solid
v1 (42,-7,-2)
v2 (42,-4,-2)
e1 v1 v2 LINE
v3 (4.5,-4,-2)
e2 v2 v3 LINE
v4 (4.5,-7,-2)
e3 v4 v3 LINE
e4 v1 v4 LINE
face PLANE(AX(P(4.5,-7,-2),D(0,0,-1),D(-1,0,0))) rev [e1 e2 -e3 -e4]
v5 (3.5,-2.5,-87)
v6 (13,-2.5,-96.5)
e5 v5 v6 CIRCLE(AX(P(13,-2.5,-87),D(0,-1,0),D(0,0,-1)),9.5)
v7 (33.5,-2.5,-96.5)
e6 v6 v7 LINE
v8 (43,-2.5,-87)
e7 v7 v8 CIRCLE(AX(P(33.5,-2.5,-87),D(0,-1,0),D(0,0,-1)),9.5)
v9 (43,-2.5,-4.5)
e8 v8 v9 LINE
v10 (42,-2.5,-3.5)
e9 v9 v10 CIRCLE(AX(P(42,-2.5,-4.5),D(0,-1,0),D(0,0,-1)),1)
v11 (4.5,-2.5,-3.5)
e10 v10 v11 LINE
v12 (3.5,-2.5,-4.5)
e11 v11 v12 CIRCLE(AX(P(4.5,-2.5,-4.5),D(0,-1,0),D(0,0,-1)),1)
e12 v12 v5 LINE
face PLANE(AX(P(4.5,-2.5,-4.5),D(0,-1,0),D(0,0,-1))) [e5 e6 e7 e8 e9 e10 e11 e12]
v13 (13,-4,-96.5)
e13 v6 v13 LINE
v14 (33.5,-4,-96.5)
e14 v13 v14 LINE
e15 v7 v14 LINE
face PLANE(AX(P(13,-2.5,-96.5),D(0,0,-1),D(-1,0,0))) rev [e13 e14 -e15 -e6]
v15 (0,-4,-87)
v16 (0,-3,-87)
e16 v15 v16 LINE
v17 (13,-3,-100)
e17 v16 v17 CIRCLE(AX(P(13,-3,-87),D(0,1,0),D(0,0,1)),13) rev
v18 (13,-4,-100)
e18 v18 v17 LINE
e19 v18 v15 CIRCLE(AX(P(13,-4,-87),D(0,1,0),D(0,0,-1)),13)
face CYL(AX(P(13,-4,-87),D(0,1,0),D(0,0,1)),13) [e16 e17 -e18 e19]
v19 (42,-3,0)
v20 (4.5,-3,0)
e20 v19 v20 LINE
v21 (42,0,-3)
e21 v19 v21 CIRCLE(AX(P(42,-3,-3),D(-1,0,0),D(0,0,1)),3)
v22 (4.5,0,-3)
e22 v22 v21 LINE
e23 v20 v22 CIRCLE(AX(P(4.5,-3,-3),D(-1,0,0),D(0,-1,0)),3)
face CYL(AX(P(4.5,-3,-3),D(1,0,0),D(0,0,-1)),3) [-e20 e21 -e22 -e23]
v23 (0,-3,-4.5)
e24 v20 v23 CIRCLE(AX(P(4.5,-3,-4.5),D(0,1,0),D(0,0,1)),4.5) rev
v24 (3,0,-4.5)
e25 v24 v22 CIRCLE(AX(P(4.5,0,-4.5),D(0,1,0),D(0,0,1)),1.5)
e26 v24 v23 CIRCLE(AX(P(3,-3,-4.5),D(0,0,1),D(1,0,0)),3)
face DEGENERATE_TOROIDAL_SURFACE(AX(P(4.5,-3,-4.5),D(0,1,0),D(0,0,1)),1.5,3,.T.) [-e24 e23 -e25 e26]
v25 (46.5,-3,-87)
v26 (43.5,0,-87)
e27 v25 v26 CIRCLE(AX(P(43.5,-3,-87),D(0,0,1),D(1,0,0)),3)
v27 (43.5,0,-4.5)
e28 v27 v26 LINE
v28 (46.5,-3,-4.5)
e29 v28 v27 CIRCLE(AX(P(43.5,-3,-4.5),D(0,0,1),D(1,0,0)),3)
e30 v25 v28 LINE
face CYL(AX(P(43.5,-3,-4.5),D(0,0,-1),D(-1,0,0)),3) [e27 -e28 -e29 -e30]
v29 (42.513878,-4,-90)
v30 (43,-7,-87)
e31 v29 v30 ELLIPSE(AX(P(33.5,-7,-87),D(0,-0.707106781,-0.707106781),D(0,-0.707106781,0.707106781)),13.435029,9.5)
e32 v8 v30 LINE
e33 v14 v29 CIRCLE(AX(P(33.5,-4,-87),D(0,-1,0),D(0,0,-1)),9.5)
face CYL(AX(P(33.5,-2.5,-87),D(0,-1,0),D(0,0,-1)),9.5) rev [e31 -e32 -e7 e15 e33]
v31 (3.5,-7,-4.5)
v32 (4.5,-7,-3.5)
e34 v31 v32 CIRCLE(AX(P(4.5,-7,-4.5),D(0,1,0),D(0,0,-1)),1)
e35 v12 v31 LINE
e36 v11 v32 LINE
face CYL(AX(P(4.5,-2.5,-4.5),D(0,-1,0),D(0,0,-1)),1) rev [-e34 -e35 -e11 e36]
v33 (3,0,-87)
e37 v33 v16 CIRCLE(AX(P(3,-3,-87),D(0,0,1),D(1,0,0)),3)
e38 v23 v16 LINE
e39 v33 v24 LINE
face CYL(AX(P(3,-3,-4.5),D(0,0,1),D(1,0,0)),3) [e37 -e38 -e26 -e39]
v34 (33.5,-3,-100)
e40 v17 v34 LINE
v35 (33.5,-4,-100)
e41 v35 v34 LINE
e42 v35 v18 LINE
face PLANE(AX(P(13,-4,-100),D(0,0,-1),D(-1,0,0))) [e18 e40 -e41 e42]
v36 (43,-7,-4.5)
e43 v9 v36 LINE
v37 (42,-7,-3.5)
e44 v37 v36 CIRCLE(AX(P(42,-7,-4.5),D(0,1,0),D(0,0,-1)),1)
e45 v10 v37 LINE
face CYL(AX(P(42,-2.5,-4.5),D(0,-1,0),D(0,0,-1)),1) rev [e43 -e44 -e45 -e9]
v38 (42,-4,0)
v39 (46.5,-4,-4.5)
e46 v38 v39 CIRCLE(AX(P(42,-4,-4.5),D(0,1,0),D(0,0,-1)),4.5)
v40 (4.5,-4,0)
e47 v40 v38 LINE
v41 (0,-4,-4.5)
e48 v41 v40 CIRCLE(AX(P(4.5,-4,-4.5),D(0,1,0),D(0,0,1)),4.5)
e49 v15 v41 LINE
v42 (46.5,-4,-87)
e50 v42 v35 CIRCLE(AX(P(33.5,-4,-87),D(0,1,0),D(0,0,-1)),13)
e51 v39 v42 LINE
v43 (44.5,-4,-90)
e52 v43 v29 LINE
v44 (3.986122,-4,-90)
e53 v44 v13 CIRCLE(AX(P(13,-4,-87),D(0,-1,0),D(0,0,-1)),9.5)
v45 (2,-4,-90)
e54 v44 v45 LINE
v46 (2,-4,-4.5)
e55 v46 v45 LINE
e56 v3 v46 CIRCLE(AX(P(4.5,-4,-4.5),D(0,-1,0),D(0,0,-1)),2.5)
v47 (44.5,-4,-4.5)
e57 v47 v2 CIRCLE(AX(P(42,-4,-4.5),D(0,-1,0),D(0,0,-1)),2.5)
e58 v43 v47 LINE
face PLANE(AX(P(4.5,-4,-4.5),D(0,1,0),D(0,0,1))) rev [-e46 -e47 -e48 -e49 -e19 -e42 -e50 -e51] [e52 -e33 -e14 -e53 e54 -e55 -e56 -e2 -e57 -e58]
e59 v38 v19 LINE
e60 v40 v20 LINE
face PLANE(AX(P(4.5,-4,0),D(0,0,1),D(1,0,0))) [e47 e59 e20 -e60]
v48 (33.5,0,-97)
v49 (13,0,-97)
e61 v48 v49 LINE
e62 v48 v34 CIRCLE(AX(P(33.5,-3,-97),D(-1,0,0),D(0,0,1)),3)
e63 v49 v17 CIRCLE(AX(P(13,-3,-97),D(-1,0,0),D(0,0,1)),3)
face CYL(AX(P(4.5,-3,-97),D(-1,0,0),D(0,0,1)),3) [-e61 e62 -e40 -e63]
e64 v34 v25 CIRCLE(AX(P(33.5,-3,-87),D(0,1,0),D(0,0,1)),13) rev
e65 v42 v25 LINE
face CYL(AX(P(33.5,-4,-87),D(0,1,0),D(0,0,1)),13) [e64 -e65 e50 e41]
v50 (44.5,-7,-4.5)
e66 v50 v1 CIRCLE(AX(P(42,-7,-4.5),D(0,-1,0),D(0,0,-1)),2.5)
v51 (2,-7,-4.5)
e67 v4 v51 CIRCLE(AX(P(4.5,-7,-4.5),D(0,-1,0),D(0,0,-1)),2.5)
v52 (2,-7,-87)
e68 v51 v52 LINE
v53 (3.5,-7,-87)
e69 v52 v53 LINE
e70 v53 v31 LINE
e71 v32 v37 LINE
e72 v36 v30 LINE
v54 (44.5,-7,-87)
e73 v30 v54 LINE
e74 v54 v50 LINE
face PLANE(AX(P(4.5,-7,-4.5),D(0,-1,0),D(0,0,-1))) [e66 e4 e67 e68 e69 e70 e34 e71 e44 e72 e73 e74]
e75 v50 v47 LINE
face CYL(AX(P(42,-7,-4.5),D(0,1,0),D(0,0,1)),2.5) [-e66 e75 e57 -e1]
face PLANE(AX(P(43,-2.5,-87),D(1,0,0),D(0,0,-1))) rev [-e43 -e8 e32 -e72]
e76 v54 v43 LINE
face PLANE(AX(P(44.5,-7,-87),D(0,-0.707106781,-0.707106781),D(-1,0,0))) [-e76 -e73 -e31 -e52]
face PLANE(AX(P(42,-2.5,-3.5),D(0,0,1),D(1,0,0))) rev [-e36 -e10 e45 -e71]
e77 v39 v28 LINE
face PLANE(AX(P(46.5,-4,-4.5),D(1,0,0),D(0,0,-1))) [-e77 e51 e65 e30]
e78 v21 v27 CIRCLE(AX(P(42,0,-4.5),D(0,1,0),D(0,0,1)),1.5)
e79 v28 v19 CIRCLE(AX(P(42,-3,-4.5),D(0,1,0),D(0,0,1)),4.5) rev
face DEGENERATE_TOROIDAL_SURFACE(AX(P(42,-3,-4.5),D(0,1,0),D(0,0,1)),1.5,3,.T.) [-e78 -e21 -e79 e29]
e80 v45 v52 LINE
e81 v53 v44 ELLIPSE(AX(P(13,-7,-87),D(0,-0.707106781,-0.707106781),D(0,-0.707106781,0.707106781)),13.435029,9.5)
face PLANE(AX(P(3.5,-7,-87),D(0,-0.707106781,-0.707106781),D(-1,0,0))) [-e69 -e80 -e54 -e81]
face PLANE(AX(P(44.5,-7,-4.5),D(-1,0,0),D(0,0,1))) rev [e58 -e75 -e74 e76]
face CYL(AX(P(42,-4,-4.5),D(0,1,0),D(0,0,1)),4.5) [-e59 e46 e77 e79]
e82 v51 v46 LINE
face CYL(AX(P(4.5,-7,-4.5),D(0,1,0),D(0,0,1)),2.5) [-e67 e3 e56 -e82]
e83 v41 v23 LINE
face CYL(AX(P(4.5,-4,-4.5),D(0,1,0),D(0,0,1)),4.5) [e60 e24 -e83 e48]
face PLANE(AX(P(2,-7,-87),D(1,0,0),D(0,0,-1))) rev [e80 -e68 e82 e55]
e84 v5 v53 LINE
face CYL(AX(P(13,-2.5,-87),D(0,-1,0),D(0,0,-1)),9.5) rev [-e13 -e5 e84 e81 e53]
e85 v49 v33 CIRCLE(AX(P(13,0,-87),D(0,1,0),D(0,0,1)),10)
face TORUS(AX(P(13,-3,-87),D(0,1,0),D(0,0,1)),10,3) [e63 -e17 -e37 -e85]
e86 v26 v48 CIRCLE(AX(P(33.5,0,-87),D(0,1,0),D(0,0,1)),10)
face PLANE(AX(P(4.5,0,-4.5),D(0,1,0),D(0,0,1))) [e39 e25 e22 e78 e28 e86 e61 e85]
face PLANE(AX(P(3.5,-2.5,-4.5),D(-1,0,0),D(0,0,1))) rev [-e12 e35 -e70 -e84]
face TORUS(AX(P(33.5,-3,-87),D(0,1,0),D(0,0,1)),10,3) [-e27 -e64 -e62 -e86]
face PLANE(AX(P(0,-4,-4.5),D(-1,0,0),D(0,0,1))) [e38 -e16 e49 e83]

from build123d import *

# Parameters (mm, degrees)
EXTRUDE_1_DEPTH     = 4
CUT_EXTRUDE_1_DEPTH = 1.5
EXTRUDE_START       = 3
EXTRUDE_2_DEPTH     = 3
CHAMFER_1_SIZE      = 3
FILLET_1_R          = 3


with BuildPart() as part:
    # Эскиз1 → Бобышка-Вытянуть1 (new body)
    with BuildSketch(Plane(origin=(0, 0, 0), x_dir=(1, 0, 0), z_dir=(0, 1, 0))):
        with BuildLine():
            Line((4.5, 0), (42, 0))
            ThreePointArc((42, 0), (45.181980515, 1.318019485), (46.5, 4.5))
            Line((46.5, 4.5), (46.5, 87))
            ThreePointArc((46.5, 87), (42.692388155, 96.192388155), (33.5, 100))
            Line((33.5, 100), (13, 100))
            ThreePointArc((13, 100), (3.807611845, 96.192388155), (0, 87))
            Line((0, 87), (0, 4.5))
            ThreePointArc((0, 4.5), (1.318019485, 1.318019485), (4.5, 0))
        make_face()
    extrude(amount=-EXTRUDE_1_DEPTH)

    # Эскиз2 → Вырез-Вытянуть1 (cut)
    with BuildSketch(Plane.XZ.offset(4)):
        with BuildLine():
            Line((3.5, -4.5), (3.5, -87))
            ThreePointArc((3.5, -87), (6.282485579, -93.717514421), (13, -96.5))
            Line((13, -96.5), (33.5, -96.5))
            ThreePointArc((33.5, -96.5), (40.217514421, -93.717514421), (43, -87))
            Line((43, -87), (43, -4.5))
            ThreePointArc((43, -4.5), (42.707106781, -3.792893219), (42, -3.5))
            Line((42, -3.5), (4.5, -3.5))
            ThreePointArc((4.5, -3.5), (3.792893219, -3.792893219), (3.5, -4.5))
        make_face()
    extrude(amount=-CUT_EXTRUDE_1_DEPTH, mode=Mode.SUBTRACT)

    # Эскиз3 → Бобышка-Вытянуть2 (add)
    with BuildSketch(Plane(origin=(0, -4, 0), x_dir=(-1, 0, 0), z_dir=(0, -1, 0)).offset(EXTRUDE_START)):
        with BuildLine():
            Line((-2, 87), (-2, 4.5))
            ThreePointArc((-2, 4.5), (-2.732233047, 2.732233047), (-4.5, 2))
            Line((-4.5, 2), (-42, 2))
            ThreePointArc((-42, 2), (-43.767766953, 2.732233047), (-44.5, 4.5))
            Line((-44.5, 4.5), (-44.5, 87))
            Line((-44.5, 87), (-43, 87))
            Line((-43, 87), (-43, 4.5))
            ThreePointArc((-43, 4.5), (-42.707106781, 3.792893219), (-42, 3.5))
            Line((-42, 3.5), (-4.5, 3.5))
            ThreePointArc((-4.5, 3.5), (-3.792893219, 3.792893219), (-3.5, 4.5))
            Line((-3.5, 4.5), (-3.5, 87))
            Line((-3.5, 87), (-2, 87))
        make_face()
    extrude(amount=-EXTRUDE_2_DEPTH)

    # Фаска1
    # the kernel refuses this chamfer: 3 mm, written as the material it adds along each edge
    with BuildSketch(Plane(origin=(11.215048964, -4, -87), x_dir=(0, 0.027495876610586334, -0.9996219169112968), z_dir=(-1, 0, 0))) as chamfer_1_piece_1_section:
        Polygon((CHAMFER_1_SIZE * 0.999621916911, CHAMFER_1_SIZE * 0.0274958766106), (-CHAMFER_1_SIZE * 0.0274958766106, CHAMFER_1_SIZE * 0.999621916911), (0, 0), align=None)
    chamfer_1_piece_1 = extrude(amount=9.215048964, mode=Mode.PRIVATE)
    chamfer_1_piece_1 = chamfer_1_piece_1 - Plane(origin=(13, -4.5189099, -87), x_dir=(-1, 0, 0), z_dir=(0, -1, 0)) * Cylinder(9.5, 31, mode=Mode.PRIVATE)
    chamfer_1_piece_1 = split(chamfer_1_piece_1, bisect_by=Plane(origin=(3.605353411, -7, -88.883676774), z_dir=(0, 1, 0)), keep=Keep.TOP, mode=Mode.PRIVATE)
    add(chamfer_1_piece_1)
    with BuildSketch(Plane(origin=(44.5, -4, -87), x_dir=(0, 0.027495876610586334, -0.9996219169112968), z_dir=(-1, 0, 0))) as chamfer_1_piece_2_section:
        Polygon((CHAMFER_1_SIZE * 0.999621916911, CHAMFER_1_SIZE * 0.0274958766106), (-CHAMFER_1_SIZE * 0.0274958766106, CHAMFER_1_SIZE * 0.999621916911), (0, 0), align=None)
    chamfer_1_piece_2 = extrude(amount=9.215048964, mode=Mode.PRIVATE)
    chamfer_1_piece_2 = chamfer_1_piece_2 - Plane(origin=(33.5, -4.985903001, -87), x_dir=(0, 0, -1), z_dir=(0, -1, 0)) * Cylinder(9.5, 31, mode=Mode.PRIVATE)
    chamfer_1_piece_2 = split(chamfer_1_piece_2, bisect_by=Plane(origin=(43.75, -7, -87.991212463), z_dir=(0, 1, 0)), keep=Keep.TOP, mode=Mode.PRIVATE)
    add(chamfer_1_piece_2)

    # Скругление1
    fillet_1_edges = [part.edges().sort_by_distance(p)[0] for p in [
        (23.25, 0, 0),
        (1.318019485, 0, -1.318019485),
        (0, 0, -45.75),
        (3.807611845, 0, -96.192388155),
        (23.25, 0, -100),
        (42.692388155, 0, -96.192388155),
        (46.5, 0, -45.75),
        (45.181980515, 0, -1.318019485),
    ]]
    fillet(fillet_1_edges, radius=FILLET_1_R)


solid = part.part
